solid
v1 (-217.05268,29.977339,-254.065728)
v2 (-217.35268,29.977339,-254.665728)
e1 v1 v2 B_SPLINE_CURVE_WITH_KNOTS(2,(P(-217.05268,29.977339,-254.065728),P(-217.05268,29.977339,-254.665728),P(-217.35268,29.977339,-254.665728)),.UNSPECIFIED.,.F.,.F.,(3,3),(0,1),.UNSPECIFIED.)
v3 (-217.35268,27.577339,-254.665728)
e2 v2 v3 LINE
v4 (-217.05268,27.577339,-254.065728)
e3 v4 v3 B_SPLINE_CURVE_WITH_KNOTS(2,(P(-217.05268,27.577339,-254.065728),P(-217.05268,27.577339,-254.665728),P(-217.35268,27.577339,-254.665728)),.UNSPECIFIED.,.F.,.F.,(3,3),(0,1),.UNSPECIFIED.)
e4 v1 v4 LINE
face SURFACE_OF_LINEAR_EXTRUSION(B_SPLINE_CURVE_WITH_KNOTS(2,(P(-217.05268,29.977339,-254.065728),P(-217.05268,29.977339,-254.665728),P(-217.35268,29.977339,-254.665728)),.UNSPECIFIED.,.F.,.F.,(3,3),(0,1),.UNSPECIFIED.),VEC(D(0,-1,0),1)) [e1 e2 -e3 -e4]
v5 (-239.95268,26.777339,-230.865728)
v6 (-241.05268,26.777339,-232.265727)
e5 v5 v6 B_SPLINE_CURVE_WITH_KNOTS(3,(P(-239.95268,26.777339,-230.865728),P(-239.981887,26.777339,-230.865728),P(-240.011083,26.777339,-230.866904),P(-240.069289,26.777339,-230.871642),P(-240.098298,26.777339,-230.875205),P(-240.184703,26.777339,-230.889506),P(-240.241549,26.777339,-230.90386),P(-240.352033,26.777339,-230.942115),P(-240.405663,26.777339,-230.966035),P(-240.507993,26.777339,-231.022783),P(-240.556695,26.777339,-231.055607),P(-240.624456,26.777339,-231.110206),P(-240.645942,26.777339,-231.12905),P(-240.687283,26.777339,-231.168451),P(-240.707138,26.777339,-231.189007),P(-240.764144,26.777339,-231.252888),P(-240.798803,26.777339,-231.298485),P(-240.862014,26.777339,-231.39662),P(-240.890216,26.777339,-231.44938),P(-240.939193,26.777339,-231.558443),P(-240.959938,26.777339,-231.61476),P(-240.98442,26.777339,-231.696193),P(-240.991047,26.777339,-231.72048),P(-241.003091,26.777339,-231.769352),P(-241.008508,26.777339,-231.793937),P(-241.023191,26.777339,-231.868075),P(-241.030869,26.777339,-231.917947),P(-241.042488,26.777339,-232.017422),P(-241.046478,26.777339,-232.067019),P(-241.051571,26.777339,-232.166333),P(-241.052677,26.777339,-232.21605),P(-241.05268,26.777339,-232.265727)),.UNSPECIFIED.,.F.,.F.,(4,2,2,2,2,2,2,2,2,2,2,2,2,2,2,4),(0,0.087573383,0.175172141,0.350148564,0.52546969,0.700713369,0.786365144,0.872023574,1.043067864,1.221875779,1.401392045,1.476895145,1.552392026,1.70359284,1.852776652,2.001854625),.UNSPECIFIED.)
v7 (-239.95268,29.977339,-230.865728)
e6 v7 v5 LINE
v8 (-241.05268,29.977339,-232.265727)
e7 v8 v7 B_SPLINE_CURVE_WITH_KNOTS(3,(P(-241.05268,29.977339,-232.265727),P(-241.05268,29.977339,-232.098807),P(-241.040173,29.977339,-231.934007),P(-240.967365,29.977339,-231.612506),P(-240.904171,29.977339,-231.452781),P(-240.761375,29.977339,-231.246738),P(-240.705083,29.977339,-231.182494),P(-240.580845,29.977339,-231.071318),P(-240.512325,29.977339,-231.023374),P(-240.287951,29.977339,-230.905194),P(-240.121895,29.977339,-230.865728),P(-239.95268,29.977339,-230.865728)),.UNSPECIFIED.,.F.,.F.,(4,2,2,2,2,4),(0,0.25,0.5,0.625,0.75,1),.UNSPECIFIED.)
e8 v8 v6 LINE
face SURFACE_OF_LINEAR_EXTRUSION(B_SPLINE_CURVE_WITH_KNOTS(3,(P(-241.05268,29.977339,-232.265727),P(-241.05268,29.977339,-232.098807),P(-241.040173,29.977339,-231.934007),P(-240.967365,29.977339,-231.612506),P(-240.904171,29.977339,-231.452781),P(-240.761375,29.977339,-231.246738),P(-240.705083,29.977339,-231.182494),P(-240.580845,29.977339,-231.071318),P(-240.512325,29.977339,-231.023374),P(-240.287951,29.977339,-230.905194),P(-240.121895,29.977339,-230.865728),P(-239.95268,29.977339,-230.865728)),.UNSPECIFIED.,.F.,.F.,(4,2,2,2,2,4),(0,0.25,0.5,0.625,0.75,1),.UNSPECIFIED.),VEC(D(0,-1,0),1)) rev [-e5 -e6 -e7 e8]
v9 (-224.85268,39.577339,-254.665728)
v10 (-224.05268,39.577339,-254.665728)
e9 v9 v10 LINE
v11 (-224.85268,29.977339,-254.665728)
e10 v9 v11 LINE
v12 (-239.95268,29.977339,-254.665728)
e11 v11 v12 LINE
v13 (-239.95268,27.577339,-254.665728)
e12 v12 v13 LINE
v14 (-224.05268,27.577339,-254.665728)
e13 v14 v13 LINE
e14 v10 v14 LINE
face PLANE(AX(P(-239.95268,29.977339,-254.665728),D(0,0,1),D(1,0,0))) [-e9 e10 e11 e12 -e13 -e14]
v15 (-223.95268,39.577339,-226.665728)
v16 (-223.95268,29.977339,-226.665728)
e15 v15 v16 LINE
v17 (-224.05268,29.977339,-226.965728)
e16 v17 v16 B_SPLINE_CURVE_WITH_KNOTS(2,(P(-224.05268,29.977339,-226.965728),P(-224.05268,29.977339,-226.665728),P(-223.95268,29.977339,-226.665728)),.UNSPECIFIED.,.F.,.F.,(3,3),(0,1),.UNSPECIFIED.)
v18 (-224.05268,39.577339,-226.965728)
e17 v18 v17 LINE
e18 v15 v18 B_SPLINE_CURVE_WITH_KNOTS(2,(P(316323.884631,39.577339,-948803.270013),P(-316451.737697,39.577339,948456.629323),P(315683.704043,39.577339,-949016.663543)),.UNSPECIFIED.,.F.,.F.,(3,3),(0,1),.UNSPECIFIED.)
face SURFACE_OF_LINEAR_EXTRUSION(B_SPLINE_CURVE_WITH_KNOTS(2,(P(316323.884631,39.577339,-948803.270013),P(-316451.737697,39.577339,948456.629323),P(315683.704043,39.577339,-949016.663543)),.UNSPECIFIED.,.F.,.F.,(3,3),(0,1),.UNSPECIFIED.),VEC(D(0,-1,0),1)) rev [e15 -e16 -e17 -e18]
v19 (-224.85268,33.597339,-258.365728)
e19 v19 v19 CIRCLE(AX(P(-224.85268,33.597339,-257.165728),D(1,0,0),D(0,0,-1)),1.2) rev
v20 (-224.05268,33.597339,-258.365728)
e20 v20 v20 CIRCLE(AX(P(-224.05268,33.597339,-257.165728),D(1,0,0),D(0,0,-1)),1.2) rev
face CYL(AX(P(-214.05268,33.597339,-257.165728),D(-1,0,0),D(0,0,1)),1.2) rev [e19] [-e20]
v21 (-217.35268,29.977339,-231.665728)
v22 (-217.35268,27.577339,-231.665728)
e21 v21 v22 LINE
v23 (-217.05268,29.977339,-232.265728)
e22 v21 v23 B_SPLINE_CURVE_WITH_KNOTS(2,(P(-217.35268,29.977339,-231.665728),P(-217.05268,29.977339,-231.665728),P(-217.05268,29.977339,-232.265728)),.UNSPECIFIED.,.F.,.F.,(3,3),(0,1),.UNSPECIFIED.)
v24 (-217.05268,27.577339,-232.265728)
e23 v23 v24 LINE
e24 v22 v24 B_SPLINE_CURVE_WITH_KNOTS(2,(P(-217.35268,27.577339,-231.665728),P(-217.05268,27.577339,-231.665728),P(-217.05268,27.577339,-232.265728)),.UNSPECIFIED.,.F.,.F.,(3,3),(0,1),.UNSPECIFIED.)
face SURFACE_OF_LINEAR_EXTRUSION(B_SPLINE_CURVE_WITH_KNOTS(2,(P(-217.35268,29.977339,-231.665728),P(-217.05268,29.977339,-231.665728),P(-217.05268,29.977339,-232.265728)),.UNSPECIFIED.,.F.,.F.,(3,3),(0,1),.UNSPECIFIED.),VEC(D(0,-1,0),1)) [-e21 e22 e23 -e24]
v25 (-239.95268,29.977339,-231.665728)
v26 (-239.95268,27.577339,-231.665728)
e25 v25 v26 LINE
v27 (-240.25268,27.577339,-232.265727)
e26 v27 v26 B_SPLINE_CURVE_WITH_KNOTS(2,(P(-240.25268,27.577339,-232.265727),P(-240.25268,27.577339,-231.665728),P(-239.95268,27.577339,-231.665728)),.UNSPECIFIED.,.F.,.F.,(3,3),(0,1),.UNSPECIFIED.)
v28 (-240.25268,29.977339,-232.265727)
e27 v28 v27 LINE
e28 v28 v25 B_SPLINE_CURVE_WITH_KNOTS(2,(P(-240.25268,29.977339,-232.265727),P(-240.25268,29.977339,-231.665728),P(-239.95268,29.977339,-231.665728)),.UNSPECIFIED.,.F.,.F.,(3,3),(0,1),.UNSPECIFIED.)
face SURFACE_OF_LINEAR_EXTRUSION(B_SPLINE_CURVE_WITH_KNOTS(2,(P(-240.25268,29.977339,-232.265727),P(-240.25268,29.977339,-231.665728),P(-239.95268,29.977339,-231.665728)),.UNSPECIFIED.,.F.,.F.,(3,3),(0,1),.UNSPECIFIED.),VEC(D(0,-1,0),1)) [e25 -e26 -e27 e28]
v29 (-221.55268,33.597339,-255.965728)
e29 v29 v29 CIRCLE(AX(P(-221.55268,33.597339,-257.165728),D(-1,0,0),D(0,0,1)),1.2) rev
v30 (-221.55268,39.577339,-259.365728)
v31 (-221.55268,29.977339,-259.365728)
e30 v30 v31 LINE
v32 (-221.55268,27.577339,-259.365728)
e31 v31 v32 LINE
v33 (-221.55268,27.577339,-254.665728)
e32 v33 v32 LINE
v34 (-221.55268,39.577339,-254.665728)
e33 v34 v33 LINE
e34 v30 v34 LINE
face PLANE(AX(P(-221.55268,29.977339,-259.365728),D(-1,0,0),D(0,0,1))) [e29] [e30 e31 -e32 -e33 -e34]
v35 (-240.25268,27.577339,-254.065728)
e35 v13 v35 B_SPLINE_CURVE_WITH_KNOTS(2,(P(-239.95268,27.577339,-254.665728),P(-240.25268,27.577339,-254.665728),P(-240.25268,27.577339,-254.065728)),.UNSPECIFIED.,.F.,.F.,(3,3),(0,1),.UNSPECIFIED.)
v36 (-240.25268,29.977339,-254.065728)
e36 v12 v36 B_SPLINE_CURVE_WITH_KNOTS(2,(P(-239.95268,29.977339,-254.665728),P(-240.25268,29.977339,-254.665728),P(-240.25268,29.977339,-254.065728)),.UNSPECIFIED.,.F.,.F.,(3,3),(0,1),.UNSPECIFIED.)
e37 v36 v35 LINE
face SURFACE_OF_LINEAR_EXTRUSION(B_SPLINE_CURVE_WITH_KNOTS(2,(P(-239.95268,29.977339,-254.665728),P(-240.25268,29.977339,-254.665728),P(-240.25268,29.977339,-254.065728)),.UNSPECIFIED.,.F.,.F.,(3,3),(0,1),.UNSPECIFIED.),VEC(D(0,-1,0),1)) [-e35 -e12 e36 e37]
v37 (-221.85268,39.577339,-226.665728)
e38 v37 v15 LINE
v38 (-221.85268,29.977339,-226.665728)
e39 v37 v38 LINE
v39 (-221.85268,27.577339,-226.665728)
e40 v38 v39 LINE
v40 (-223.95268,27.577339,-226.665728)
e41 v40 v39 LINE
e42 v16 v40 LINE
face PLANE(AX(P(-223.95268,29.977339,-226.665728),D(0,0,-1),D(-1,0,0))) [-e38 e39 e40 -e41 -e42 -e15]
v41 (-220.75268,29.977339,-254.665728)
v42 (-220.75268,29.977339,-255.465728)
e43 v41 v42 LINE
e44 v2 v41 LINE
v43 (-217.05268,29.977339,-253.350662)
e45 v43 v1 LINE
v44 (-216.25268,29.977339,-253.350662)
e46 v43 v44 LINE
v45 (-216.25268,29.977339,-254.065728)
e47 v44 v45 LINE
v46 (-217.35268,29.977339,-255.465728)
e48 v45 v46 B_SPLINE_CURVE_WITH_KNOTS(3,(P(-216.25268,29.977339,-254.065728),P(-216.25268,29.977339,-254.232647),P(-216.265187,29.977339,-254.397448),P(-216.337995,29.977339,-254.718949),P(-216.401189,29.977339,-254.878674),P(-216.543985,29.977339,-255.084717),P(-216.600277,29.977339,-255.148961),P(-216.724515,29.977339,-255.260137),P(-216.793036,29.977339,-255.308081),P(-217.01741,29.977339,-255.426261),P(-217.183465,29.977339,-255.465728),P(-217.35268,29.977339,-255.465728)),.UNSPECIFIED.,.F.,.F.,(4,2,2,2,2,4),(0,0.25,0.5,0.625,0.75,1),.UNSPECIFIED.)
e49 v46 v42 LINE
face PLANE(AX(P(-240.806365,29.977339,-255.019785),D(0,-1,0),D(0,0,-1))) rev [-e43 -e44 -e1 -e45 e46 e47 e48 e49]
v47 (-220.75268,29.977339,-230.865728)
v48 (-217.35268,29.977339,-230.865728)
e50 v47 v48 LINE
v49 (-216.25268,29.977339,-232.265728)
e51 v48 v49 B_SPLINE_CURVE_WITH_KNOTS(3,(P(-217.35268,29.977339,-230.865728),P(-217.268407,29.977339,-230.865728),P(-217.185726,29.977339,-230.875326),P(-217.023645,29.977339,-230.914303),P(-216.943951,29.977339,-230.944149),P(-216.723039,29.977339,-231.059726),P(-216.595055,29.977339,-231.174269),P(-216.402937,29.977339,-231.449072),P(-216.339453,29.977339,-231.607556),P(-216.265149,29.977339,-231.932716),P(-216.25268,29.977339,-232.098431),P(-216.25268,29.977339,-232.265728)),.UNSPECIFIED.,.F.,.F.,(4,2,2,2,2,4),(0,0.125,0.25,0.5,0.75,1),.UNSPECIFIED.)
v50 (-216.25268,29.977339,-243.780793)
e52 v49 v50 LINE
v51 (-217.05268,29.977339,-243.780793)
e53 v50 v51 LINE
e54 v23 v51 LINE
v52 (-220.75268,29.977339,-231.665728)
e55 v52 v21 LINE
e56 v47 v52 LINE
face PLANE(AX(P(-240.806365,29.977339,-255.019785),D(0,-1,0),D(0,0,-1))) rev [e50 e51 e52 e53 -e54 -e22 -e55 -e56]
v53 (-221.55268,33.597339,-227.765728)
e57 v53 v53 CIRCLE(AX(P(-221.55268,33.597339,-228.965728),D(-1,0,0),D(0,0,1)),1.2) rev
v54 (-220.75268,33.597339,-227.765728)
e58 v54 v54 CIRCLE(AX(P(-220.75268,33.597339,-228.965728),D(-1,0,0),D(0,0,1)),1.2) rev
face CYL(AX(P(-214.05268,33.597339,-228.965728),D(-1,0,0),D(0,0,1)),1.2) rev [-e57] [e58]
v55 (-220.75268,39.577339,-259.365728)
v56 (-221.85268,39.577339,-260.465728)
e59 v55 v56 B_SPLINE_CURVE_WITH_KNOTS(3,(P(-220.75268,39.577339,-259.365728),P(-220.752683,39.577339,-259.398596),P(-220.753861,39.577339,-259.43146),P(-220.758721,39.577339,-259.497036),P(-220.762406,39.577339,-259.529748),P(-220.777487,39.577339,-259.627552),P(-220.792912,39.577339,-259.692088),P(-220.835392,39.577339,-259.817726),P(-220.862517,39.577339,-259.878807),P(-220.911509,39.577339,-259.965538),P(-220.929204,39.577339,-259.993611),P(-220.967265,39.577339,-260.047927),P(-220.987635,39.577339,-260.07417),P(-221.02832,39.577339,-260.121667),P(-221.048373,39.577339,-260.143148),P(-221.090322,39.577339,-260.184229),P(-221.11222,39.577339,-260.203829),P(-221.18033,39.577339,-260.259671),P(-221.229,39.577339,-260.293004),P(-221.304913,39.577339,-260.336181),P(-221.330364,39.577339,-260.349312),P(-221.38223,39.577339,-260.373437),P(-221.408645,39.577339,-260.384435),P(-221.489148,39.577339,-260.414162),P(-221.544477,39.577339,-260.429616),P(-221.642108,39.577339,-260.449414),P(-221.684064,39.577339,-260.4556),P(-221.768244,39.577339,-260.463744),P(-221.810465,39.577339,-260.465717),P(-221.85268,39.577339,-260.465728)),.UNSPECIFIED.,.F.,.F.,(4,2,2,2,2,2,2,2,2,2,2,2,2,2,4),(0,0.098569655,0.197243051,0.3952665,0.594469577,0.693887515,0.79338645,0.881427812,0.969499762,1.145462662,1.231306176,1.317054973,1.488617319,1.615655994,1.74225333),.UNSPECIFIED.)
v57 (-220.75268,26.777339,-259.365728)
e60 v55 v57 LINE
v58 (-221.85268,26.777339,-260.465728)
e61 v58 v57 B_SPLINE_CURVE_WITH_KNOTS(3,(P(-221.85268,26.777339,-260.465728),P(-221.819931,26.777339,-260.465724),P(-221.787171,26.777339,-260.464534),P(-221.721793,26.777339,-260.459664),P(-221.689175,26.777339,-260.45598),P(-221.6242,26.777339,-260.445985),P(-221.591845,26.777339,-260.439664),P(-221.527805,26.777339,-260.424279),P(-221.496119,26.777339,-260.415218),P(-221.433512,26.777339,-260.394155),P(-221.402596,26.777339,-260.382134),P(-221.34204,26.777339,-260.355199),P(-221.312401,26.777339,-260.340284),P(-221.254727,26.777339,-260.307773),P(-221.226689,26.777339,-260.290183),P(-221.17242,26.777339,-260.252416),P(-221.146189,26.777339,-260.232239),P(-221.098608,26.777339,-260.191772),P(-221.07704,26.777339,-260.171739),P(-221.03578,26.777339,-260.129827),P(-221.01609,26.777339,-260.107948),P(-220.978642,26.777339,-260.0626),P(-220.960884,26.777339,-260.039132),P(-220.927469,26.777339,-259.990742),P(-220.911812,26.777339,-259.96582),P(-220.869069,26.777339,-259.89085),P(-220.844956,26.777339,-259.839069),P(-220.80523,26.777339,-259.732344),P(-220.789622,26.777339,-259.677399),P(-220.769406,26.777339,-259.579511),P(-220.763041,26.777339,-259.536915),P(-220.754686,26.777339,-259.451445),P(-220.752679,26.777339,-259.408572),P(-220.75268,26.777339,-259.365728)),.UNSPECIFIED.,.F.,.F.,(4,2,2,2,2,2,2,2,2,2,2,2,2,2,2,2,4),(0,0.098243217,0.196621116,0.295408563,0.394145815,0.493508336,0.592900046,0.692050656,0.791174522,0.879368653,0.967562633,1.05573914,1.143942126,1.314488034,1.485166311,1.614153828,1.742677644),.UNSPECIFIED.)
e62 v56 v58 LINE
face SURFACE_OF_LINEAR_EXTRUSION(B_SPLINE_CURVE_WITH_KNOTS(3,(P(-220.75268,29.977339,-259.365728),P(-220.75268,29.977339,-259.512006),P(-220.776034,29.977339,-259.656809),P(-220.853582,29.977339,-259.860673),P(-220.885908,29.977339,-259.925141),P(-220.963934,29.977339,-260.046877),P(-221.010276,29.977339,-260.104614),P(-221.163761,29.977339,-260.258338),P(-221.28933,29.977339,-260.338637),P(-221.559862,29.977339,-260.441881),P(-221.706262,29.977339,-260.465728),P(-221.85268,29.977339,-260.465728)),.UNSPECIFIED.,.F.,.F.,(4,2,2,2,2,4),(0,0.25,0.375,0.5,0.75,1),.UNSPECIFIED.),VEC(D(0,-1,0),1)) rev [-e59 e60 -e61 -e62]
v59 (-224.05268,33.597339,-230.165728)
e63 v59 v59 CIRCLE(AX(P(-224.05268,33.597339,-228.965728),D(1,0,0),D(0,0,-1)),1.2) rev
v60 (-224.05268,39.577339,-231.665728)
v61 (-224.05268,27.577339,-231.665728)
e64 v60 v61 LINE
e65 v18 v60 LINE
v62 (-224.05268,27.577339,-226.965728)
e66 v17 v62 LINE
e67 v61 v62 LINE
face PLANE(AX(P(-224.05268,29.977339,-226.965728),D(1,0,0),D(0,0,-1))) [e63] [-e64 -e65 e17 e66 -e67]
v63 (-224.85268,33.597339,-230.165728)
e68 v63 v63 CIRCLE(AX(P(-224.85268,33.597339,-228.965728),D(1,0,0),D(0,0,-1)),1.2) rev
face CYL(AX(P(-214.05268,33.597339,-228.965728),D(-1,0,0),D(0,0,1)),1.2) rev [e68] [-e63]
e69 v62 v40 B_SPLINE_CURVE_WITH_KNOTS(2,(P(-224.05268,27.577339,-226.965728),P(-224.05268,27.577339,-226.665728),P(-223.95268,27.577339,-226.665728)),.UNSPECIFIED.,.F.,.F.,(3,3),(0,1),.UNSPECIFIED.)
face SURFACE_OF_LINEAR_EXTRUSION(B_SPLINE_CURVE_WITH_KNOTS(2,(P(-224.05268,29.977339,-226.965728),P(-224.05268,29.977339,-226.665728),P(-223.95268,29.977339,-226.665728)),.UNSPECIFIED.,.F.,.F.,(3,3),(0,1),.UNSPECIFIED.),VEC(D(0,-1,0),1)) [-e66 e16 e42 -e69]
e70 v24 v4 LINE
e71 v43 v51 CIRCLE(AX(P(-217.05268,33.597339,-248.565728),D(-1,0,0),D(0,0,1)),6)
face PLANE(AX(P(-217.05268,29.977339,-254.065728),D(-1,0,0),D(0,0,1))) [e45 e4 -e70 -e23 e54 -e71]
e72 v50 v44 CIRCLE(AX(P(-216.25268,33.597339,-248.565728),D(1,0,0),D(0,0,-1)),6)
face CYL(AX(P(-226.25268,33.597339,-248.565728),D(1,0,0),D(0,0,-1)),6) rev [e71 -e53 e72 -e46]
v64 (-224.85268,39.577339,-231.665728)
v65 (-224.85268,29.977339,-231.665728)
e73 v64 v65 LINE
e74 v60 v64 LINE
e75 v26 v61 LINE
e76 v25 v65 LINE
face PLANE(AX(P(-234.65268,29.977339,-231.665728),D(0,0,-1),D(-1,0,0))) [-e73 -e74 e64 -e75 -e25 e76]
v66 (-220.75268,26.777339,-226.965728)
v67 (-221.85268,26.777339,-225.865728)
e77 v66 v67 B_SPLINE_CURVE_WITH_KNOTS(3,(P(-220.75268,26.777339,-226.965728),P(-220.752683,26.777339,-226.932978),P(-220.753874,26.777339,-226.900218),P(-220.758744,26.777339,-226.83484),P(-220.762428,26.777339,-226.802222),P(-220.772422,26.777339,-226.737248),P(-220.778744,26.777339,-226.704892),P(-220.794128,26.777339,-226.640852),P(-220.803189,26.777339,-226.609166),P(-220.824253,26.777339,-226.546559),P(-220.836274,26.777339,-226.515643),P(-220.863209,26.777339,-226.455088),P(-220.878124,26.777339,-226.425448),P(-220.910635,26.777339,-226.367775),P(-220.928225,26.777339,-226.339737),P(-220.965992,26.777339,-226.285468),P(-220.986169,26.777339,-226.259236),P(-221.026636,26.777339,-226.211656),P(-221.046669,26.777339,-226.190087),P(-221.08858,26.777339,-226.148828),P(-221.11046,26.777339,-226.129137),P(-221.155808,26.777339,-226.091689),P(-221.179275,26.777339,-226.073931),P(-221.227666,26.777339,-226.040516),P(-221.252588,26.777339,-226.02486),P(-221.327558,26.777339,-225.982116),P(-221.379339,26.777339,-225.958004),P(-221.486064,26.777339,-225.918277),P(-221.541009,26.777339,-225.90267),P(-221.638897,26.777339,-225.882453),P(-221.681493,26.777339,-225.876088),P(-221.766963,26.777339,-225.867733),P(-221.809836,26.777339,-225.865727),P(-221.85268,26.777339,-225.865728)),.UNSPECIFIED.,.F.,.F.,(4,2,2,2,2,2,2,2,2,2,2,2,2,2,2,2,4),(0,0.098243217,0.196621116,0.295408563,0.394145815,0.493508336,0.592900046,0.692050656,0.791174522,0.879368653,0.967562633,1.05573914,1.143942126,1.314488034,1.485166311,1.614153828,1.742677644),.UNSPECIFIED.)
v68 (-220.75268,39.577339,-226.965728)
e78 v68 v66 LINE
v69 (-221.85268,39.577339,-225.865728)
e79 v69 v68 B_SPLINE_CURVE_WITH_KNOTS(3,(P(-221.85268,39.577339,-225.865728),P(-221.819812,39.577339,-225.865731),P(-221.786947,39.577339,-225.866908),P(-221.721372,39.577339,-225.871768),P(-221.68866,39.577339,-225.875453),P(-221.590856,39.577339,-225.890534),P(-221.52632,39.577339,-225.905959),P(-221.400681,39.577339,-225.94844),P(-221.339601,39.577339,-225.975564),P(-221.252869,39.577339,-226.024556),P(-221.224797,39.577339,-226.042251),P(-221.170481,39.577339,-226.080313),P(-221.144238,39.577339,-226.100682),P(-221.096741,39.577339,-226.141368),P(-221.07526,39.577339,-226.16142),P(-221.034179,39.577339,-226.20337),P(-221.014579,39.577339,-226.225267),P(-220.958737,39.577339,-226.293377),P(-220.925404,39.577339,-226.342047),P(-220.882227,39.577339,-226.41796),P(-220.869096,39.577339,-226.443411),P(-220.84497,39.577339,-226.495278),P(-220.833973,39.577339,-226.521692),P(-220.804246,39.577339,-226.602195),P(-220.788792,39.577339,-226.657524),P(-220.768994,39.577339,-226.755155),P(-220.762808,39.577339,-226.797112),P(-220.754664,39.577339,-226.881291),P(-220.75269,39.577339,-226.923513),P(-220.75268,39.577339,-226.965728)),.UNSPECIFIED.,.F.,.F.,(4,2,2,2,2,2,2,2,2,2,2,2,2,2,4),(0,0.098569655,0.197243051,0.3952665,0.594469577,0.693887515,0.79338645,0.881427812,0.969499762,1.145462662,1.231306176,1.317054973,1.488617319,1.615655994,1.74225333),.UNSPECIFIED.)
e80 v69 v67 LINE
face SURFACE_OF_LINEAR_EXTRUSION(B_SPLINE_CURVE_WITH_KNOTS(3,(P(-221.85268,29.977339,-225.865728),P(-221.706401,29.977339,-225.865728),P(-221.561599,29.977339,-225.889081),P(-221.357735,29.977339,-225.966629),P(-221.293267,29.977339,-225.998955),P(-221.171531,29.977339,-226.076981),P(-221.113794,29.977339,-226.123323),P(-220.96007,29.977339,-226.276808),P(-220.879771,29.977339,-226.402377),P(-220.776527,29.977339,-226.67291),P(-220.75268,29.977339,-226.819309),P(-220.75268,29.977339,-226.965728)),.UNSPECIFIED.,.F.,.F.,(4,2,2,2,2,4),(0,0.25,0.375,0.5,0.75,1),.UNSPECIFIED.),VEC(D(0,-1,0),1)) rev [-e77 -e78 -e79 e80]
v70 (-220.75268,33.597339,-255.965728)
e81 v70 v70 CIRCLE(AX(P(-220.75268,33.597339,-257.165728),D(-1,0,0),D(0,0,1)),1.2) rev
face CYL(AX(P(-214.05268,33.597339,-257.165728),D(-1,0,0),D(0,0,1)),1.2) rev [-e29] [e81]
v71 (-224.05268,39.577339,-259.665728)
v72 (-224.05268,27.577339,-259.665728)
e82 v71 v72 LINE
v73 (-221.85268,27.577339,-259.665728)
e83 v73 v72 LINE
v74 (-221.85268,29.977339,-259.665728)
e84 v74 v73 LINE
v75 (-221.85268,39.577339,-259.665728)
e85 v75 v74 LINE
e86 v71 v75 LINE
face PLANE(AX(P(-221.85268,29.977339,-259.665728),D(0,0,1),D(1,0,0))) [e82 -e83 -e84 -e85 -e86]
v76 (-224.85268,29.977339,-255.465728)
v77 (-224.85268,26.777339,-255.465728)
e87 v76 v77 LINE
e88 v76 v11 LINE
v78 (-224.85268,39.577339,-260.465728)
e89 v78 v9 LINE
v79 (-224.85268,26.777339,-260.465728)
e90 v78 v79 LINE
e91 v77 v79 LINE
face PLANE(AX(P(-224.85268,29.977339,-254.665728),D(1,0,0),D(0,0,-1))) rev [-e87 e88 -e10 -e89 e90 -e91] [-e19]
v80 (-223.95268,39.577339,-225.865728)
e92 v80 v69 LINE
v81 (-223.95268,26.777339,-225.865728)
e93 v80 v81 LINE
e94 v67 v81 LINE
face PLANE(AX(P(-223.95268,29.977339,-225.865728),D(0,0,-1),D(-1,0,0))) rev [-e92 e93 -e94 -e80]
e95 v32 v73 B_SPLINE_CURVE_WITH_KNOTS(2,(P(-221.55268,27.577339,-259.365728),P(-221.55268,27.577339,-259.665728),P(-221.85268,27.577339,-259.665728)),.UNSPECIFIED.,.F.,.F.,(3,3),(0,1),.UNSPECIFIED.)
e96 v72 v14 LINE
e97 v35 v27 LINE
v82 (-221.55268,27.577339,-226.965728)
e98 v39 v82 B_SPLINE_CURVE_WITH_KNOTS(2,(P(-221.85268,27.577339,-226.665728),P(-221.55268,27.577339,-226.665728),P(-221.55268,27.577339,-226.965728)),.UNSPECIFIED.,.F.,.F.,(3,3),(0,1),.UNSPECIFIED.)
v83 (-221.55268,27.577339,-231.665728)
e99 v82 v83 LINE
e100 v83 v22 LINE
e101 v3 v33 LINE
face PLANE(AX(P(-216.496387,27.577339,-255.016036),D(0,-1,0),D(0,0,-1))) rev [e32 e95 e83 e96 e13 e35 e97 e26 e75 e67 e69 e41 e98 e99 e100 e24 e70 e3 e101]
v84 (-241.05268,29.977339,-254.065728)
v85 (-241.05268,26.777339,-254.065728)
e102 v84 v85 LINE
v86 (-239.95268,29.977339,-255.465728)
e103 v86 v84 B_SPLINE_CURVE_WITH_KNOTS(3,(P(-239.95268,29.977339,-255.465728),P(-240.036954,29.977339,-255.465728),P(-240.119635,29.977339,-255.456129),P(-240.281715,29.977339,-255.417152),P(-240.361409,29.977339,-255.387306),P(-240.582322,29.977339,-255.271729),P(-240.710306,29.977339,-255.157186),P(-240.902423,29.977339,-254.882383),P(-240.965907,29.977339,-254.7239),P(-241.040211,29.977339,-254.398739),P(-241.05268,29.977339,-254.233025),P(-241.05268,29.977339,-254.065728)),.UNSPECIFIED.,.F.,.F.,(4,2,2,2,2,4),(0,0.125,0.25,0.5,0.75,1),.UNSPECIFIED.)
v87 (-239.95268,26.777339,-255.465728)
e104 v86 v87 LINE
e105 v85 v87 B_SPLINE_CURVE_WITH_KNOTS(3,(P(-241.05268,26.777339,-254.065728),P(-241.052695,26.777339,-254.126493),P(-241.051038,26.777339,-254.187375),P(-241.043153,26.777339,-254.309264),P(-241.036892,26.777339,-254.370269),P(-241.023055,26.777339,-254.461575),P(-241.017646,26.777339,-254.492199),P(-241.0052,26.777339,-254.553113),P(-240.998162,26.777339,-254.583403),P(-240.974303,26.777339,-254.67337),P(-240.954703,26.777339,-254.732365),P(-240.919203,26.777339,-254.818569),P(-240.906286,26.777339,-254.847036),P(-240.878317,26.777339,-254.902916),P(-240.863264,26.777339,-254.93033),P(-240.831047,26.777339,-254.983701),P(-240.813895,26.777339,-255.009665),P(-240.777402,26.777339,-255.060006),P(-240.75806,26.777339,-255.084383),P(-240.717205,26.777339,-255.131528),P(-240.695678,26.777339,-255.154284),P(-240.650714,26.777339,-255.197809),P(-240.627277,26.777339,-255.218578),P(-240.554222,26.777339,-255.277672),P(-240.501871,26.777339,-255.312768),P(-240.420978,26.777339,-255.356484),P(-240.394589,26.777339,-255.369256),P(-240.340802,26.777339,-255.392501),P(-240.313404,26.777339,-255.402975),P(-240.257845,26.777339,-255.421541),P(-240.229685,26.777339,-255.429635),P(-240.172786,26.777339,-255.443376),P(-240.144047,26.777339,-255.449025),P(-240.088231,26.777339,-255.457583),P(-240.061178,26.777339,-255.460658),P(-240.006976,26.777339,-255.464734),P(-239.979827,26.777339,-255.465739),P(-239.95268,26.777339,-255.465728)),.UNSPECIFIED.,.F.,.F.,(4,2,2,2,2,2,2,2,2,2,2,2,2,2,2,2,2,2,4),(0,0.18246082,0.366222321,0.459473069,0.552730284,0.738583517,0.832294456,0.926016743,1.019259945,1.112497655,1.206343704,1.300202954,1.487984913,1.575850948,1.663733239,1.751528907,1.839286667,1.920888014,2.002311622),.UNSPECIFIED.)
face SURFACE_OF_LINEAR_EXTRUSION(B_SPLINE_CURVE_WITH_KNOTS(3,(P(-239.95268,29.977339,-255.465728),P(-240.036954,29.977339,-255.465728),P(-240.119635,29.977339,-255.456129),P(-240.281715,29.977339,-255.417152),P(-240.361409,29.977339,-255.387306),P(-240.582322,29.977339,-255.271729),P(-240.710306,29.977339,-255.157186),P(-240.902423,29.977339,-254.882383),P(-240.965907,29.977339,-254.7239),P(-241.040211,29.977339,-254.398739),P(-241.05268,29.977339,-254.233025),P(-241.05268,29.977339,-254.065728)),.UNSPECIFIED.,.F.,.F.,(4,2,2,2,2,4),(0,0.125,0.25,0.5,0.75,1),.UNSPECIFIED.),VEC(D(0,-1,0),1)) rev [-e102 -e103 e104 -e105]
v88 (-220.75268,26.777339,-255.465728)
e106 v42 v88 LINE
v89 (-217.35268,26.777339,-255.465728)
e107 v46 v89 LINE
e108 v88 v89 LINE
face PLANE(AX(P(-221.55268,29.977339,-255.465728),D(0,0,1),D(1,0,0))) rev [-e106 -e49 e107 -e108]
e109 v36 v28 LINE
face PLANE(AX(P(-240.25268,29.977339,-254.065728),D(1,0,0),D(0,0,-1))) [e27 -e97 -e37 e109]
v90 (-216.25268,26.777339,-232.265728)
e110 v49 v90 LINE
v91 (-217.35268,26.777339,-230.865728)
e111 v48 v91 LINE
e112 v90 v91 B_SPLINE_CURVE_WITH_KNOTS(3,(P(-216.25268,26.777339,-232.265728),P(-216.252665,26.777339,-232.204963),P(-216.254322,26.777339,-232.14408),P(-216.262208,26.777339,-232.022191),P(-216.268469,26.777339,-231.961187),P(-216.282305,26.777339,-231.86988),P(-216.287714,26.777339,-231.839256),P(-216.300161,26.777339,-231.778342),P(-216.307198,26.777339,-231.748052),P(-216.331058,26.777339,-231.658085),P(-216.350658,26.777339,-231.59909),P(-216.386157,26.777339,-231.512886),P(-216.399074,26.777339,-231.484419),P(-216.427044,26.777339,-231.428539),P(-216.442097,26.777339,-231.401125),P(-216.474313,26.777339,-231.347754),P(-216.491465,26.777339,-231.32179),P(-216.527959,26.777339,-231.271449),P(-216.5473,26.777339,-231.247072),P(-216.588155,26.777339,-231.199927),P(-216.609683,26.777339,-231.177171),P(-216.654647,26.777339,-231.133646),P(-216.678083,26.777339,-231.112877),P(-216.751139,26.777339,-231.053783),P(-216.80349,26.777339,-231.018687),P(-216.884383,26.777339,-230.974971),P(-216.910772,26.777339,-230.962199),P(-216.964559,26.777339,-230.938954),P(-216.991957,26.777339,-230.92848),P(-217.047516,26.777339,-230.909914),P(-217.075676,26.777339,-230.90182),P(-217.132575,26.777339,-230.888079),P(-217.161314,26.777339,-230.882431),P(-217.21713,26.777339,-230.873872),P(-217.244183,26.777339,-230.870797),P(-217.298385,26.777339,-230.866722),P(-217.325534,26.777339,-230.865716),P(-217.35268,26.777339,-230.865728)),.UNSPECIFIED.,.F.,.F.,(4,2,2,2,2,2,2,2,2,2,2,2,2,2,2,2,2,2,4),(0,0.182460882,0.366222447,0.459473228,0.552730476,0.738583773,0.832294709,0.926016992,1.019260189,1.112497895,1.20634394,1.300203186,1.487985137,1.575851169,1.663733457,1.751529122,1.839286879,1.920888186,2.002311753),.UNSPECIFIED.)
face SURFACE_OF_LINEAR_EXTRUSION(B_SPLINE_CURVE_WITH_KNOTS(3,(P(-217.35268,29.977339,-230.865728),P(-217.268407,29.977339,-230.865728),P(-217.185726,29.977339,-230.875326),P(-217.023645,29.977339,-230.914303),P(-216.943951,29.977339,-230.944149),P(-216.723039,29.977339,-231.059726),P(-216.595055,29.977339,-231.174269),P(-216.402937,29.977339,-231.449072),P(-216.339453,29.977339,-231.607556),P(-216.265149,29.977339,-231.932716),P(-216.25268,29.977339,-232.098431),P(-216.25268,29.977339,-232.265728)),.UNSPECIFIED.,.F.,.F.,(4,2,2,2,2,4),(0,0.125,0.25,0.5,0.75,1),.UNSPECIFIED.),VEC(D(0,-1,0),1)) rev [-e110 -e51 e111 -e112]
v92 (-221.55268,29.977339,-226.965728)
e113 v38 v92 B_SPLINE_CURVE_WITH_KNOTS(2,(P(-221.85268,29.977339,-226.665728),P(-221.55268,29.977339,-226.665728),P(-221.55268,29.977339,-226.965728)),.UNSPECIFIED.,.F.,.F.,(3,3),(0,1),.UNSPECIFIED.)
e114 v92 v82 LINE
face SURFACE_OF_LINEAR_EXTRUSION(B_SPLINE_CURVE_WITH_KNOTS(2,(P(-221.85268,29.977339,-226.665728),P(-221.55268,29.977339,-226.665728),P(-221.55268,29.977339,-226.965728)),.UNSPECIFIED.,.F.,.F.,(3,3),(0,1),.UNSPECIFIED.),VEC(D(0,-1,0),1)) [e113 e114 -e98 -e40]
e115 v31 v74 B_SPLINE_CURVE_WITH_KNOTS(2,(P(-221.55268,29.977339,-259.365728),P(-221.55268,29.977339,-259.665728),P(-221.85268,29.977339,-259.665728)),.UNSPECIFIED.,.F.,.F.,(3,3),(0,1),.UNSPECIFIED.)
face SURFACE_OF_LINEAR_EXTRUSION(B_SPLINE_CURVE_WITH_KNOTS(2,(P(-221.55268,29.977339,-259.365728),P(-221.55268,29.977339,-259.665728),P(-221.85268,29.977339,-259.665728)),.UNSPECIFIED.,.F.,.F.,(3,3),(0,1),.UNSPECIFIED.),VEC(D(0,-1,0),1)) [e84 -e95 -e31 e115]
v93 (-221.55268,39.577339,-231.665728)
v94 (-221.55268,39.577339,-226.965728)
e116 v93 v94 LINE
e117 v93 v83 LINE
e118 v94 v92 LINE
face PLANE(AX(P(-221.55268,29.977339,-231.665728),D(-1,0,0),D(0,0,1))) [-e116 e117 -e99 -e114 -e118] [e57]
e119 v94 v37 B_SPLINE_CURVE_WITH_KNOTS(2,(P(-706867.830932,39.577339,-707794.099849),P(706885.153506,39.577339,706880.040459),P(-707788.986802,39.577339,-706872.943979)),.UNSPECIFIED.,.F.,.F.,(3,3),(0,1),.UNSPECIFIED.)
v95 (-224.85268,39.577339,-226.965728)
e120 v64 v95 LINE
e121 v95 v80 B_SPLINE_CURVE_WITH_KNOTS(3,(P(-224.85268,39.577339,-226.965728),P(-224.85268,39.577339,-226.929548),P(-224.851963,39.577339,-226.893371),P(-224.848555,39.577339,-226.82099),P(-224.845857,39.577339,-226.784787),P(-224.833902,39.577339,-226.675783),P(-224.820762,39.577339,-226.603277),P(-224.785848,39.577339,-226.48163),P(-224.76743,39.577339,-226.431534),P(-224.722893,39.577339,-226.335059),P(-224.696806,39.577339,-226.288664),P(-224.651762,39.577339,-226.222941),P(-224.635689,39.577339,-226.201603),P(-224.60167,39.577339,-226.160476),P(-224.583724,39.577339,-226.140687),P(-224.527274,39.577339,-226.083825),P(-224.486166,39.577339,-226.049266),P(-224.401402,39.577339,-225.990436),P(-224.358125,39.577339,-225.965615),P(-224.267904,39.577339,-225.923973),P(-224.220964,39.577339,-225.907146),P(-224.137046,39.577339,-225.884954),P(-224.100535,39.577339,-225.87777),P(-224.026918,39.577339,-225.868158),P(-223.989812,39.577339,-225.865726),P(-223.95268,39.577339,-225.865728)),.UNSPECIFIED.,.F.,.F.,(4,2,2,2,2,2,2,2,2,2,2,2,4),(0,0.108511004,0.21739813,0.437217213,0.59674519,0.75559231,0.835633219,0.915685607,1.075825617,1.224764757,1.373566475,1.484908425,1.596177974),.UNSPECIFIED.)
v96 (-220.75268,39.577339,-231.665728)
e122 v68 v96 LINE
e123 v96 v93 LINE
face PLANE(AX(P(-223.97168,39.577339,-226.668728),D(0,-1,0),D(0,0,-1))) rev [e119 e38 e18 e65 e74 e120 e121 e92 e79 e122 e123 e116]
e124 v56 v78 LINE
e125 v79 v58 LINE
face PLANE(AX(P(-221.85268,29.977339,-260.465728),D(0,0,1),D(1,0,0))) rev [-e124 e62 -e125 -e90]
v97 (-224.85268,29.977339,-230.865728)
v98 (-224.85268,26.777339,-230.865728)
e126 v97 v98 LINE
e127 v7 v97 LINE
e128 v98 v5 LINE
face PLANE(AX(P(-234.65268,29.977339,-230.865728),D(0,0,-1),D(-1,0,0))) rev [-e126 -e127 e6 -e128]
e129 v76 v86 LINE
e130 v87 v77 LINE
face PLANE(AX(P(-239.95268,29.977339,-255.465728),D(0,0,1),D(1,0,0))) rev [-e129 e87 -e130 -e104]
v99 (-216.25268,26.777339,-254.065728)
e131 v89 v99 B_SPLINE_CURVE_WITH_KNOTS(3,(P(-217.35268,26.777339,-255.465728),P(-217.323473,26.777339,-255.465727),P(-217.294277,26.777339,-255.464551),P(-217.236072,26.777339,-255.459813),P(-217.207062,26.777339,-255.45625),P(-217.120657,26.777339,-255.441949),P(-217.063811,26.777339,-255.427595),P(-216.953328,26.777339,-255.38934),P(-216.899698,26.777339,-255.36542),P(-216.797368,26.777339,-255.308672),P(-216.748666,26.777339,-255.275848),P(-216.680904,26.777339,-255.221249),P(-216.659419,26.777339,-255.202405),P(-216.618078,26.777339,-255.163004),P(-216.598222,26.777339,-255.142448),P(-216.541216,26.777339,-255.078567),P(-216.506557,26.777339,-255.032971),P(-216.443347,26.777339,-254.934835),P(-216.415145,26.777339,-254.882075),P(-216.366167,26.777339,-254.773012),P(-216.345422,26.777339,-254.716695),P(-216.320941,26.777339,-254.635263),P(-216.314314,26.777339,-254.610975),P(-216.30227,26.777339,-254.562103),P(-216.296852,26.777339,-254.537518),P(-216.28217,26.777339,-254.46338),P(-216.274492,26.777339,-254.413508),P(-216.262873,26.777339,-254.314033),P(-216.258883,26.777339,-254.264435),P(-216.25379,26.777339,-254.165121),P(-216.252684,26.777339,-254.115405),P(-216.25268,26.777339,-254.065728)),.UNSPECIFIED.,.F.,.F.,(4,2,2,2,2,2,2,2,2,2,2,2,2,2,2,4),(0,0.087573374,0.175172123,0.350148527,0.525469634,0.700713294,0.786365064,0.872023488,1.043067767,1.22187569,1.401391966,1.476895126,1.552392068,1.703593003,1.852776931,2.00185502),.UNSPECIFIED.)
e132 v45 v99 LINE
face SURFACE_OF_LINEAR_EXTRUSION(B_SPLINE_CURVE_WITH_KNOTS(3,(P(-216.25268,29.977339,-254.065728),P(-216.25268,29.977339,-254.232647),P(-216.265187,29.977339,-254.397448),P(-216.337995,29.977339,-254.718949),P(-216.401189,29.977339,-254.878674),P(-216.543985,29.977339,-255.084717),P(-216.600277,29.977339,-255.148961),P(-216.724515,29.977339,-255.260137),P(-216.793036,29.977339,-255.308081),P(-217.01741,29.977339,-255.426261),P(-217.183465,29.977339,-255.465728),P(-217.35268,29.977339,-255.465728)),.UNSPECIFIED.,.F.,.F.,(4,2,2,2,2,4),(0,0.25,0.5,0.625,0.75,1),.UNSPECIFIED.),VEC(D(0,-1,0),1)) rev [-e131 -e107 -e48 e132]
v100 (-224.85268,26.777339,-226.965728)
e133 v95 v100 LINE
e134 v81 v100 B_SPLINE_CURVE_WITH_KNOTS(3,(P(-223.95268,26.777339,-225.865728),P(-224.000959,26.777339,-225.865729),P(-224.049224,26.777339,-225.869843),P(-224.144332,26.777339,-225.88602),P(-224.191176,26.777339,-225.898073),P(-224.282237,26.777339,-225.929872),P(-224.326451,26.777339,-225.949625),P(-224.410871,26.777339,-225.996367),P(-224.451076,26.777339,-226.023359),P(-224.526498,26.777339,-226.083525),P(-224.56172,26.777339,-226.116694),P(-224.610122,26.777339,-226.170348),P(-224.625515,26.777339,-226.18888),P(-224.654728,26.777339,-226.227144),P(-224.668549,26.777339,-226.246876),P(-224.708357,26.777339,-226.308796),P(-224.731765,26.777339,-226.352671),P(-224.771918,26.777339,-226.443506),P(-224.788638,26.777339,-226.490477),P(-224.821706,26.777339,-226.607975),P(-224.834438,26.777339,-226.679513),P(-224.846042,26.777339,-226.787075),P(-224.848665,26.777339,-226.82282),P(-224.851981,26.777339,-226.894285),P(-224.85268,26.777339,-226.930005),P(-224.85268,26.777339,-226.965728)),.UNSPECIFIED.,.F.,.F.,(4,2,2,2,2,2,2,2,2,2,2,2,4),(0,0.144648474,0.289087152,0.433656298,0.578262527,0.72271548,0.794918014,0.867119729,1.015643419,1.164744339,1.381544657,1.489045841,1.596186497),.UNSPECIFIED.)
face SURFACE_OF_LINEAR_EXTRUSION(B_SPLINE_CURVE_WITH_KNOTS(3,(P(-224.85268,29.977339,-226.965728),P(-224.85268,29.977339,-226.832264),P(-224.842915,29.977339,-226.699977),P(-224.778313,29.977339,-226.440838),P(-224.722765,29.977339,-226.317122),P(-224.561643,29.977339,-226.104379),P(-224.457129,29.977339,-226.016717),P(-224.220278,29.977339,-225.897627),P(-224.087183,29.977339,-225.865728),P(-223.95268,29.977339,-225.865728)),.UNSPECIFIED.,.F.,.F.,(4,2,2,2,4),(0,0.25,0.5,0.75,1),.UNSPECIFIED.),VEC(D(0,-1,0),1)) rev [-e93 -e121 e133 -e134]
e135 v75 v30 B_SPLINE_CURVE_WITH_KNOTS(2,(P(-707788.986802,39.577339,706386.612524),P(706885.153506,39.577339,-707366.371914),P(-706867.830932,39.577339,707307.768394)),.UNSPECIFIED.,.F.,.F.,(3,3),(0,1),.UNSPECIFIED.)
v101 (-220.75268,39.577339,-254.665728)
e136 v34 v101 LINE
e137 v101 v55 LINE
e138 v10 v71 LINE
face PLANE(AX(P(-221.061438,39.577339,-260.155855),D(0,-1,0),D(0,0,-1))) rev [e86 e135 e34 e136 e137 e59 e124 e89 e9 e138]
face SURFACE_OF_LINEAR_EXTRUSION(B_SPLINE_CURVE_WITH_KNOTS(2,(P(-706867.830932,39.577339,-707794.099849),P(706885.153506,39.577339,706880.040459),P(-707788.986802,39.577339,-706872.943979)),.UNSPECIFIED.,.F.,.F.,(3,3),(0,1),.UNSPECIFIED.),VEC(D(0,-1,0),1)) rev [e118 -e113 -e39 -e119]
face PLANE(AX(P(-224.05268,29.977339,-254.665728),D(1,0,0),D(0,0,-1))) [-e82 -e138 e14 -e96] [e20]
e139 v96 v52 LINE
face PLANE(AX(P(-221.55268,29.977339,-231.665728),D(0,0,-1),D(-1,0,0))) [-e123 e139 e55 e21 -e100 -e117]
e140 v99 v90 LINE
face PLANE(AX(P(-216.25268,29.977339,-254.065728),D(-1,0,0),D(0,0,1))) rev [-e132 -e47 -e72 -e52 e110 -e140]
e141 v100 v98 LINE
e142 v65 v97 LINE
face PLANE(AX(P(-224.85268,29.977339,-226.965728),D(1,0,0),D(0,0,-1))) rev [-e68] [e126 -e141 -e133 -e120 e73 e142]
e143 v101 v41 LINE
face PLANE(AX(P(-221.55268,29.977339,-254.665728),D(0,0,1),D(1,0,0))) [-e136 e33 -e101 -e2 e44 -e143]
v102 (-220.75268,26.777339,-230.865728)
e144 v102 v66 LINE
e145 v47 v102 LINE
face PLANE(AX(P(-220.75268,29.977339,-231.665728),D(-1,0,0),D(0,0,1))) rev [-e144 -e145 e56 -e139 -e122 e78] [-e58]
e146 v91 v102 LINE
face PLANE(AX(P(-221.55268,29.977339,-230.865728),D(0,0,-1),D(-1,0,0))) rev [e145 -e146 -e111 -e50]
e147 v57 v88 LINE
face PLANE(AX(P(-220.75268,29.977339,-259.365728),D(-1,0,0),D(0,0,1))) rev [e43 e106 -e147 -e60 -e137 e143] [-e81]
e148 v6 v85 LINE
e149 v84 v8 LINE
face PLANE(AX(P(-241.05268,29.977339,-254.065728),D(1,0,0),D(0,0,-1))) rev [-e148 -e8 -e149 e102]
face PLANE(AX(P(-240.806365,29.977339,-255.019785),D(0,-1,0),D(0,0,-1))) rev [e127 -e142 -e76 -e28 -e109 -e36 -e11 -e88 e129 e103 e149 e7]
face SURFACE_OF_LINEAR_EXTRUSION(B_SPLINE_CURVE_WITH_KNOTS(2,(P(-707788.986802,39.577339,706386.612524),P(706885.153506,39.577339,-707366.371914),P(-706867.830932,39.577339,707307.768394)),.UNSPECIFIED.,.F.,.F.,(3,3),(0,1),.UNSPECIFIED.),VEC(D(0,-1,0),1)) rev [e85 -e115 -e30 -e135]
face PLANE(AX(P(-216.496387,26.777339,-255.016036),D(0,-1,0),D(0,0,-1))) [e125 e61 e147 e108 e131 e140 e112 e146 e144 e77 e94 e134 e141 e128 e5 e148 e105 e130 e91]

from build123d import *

# Parameters (mm, degrees)
EXTRUDE_THIN1_DEPTH     = 2.4
CUT_EXTRUDE1_DEPTH      = 10
BOSS_EXTRUDE1_DEPTH     = 0.8
BOSS_EXTRUDE2_DEPTH     = 9.6
CUT_EXTRUDE2_DEPTH      = 10
CUT_EXTRUDE2_DEPTH_BACK = 9.6
SKETCH5_R               = 1.2
BOSS_EXTRUDE3_DEPTH     = 9.6
CUT_EXTRUDE3_DEPTH      = 10
CUT_EXTRUDE3_DEPTH_BACK = 9.6
SKETCH8_R               = 1.2


# Read off the part's stored shape, not the designer's step: Extrude-Thin1
with BuildPart() as part:
    # Extrude-Thin1 outline → Extrude-Thin1 (new body)
    with BuildSketch(Plane(origin=(0, 27.577339236, 0), x_dir=(1, 0, 0), z_dir=(0, 1, 0))):
        with BuildLine():
            Line((-221.85268026, 260.465727588), (-224.85268026, 260.465727588))
            Line((-224.85268026, 260.465727588), (-224.85268026, 255.465727588))
            Line((-224.85268026, 255.465727588), (-239.95268026, 255.465727588))
            add(Edge.make_bspline(
                [(-239.95268026, 255.465727588), (-240.036953855, 255.465727588), (-240.119634905, 255.456128928), (-240.281715302, 255.417151974), (-240.361409143, 255.387305758), (-240.582321505, 255.271729013), (-240.710305754, 255.157186074), (-240.902423276, 254.88238325), (-240.965907148, 254.723899526), (-241.040211449, 254.398738857), (-241.05268026, 254.23302474), (-241.05268026, 254.065727588)],
                knots=[0, 0, 0, 0, 0.125, 0.125, 0.25, 0.25, 0.5, 0.5, 0.75, 0.75, 1, 1, 1, 1], degree=3))
            Line((-241.05268026, 254.065727588), (-241.05268026, 232.26572715))
            add(Edge.make_bspline(
                [(-241.05268026, 232.26572715), (-241.05268026, 232.098807375), (-241.040173408, 231.934007095), (-240.967365099, 231.612506131), (-240.904171119, 231.452780727), (-240.761375105, 231.246738134), (-240.705083291, 231.182493851), (-240.580845123, 231.071317608), (-240.512324697, 231.023373693), (-240.287950739, 230.905193813), (-240.121895067, 230.865727588), (-239.95268026, 230.865727588)],
                knots=[0, 0, 0, 0, 0.25, 0.25, 0.5, 0.5, 0.625, 0.625, 0.75, 0.75, 1, 1, 1, 1], degree=3))
            Line((-239.95268026, 230.865727588), (-224.85268026, 230.865727588))
            Line((-224.85268026, 230.865727588), (-224.85268026, 226.965727588))
            add(Edge.make_bspline(
                [(-224.85268026, 226.965727588), (-224.85268026, 226.832263963), (-224.842915454, 226.699977447), (-224.778312529, 226.440837832), (-224.722765281, 226.317121604), (-224.561642632, 226.104378576), (-224.457129257, 226.016716914), (-224.220278277, 225.897626505), (-224.087183417, 225.865727588), (-223.95268026, 225.865727588)],
                knots=[0, 0, 0, 0, 0.25, 0.25, 0.5, 0.5, 0.75, 0.75, 1, 1, 1, 1], degree=3))
            Line((-223.95268026, 225.865727588), (-221.85268026, 225.865727588))
            add(Edge.make_bspline(
                [(-221.85268026, 225.865727588), (-221.706401491, 225.865727588), (-221.561598635, 225.889080891), (-221.357734958, 225.966629211), (-221.293267189, 225.998955372), (-221.171531343, 226.076981138), (-221.11379386, 226.123323344), (-220.960069989, 226.2768079), (-220.879771324, 226.40237724), (-220.776526804, 226.672909538), (-220.75268026, 226.819308973), (-220.75268026, 226.965727588)],
                knots=[0, 0, 0, 0, 0.25, 0.25, 0.375, 0.375, 0.5, 0.5, 0.75, 0.75, 1, 1, 1, 1], degree=3))
            Line((-220.75268026, 226.965727588), (-220.75268026, 230.865727588))
            Line((-220.75268026, 230.865727588), (-217.35268026, 230.865727588))
            add(Edge.make_bspline(
                [(-217.35268026, 230.865727588), (-217.268406659, 230.865727588), (-217.185725604, 230.875326251), (-217.023645197, 230.914303211), (-216.943951352, 230.944149433), (-216.723038981, 231.059726197), (-216.595054733, 231.174269153), (-216.402937217, 231.449072013), (-216.339453355, 231.607555751), (-216.265149067, 231.932716443), (-216.25268026, 232.098430571), (-216.25268026, 232.265727733)],
                knots=[0, 0, 0, 0, 0.125, 0.125, 0.25, 0.25, 0.5, 0.5, 0.75, 0.75, 1, 1, 1, 1], degree=3))
            Line((-216.25268026, 232.265727733), (-216.25268026, 254.065727588))
            add(Edge.make_bspline(
                [(-216.25268026, 254.065727588), (-216.25268026, 254.232647394), (-216.265187101, 254.397447706), (-216.337995368, 254.718948734), (-216.401189322, 254.878674187), (-216.543985311, 255.084716854), (-216.600277123, 255.148961165), (-216.724515296, 255.260137461), (-216.793035717, 255.308081394), (-217.017409717, 255.426261342), (-217.183465417, 255.465727588), (-217.35268026, 255.465727588)],
                knots=[0, 0, 0, 0, 0.25, 0.25, 0.5, 0.5, 0.625, 0.625, 0.75, 0.75, 1, 1, 1, 1], degree=3))
            Line((-217.35268026, 255.465727588), (-220.75268026, 255.465727588))
            Line((-220.75268026, 255.465727588), (-220.75268026, 259.365727588))
            add(Edge.make_bspline(
                [(-220.75268026, 259.365727588), (-220.75268026, 259.512006357), (-220.776033562, 259.656809213), (-220.853581882, 259.86067289), (-220.885908043, 259.925140659), (-220.96393381, 260.046876505), (-221.010276016, 260.104613988), (-221.163760572, 260.258337859), (-221.289329911, 260.338636524), (-221.559862209, 260.441881044), (-221.706261645, 260.465727588), (-221.85268026, 260.465727588)],
                knots=[0, 0, 0, 0, 0.25, 0.25, 0.375, 0.375, 0.5, 0.5, 0.75, 0.75, 1, 1, 1, 1], degree=3))
        make_face()
        with BuildLine():
            Line((-224.05268026, 254.665727588), (-224.05268026, 259.665727588))
            Line((-224.05268026, 259.665727588), (-221.85268026, 259.665727588))
            add(Edge.make_bspline(
                [(-221.55268026, 259.365727588), (-221.55268026, 259.665727588), (-221.85268026, 259.665727588)],
                knots=[0, 0, 0, 1, 1, 1], degree=2))
            Line((-221.55268026, 259.365727588), (-221.55268026, 254.665727588))
            Line((-221.55268026, 254.665727588), (-217.35268026, 254.665727588))
            add(Edge.make_bspline(
                [(-217.05268026, 254.065727588), (-217.05268026, 254.665727588), (-217.35268026, 254.665727588)],
                knots=[0, 0, 0, 1, 1, 1], degree=2))
            Line((-217.05268026, 254.065727588), (-217.05268026, 232.265727733))
            add(Edge.make_bspline(
                [(-217.35268026, 231.665727588), (-217.05268026, 231.665727588), (-217.05268026, 232.265727733)],
                knots=[0, 0, 0, 1, 1, 1], degree=2))
            Line((-217.35268026, 231.665727588), (-221.55268026, 231.665727588))
            Line((-221.55268026, 231.665727588), (-221.55268026, 226.965727588))
            add(Edge.make_bspline(
                [(-221.85268026, 226.665727588), (-221.55268026, 226.665727588), (-221.55268026, 226.965727588)],
                knots=[0, 0, 0, 1, 1, 1], degree=2))
            Line((-221.85268026, 226.665727588), (-223.95268026, 226.665727588))
            add(Edge.make_bspline(
                [(-224.05268026, 226.965727588), (-224.05268026, 226.665727588), (-223.95268026, 226.665727588)],
                knots=[0, 0, 0, 1, 1, 1], degree=2))
            Line((-224.05268026, 226.965727588), (-224.05268026, 231.665727588))
            Line((-224.05268026, 231.665727588), (-239.95268026, 231.665727588))
            add(Edge.make_bspline(
                [(-240.25268026, 232.26572715), (-240.25268026, 231.665727588), (-239.95268026, 231.665727588)],
                knots=[0, 0, 0, 1, 1, 1], degree=2))
            Line((-240.25268026, 232.26572715), (-240.25268026, 254.065727588))
            add(Edge.make_bspline(
                [(-239.95268026, 254.665727588), (-240.25268026, 254.665727588), (-240.25268026, 254.065727588)],
                knots=[0, 0, 0, 1, 1, 1], degree=2))
            Line((-239.95268026, 254.665727588), (-224.05268026, 254.665727588))
        make_face(mode=Mode.SUBTRACT)
    extrude(amount=EXTRUDE_THIN1_DEPTH)

    # Sketch2 → Cut-Extrude1 (cut)
    with BuildSketch(Plane(origin=(-216.25268026, 0, 0), x_dir=(0, 0, -1), z_dir=(1, 0, 0))):
        with BuildLine():
            Line((243.543526876, 30.314428941), (253.35066228, 29.977339236))
            ThreePointArc((253.35066228, 29.977339236), (248.359618009, 27.600880377), (243.543526876, 30.314428941))
        make_face()
    extrude(amount=-CUT_EXTRUDE1_DEPTH, mode=Mode.SUBTRACT)

    # Sketch3 → Boss-Extrude1 (add)
    with BuildSketch(Plane.XZ.offset(-27.577339236)):
        with BuildLine():
            Line((-217.35268026, -255.465727588), (-220.75268026, -255.465727588))
            Line((-220.75268026, -255.465727588), (-220.75268026, -259.365727588))
            add(Edge.make_bspline(
                [(-220.75268026, -259.365727588), (-220.75268026, -259.512006357), (-220.776033562, -259.656809213), (-220.853581882, -259.86067289), (-220.885908043, -259.925140659), (-220.96393381, -260.046876505), (-221.010276016, -260.104613988), (-221.163760572, -260.258337859), (-221.289329911, -260.338636524), (-221.559862209, -260.441881044), (-221.706261645, -260.465727588), (-221.85268026, -260.465727588)],
                knots=[0, 0, 0, 0, 0.25, 0.25, 0.375, 0.375, 0.5, 0.5, 0.75, 0.75, 1, 1, 1, 1], degree=3))
            Line((-221.85268026, -260.465727588), (-224.85268026, -260.465727588))
            Line((-224.85268026, -260.465727588), (-224.85268026, -255.465727588))
            Line((-224.85268026, -255.465727588), (-239.95268026, -255.465727588))
            add(Edge.make_bspline(
                [(-239.95268026, -255.465727588), (-240.036953855, -255.465727588), (-240.119634905, -255.456128928), (-240.281715302, -255.417151974), (-240.361409143, -255.387305758), (-240.582321505, -255.271729013), (-240.710305754, -255.157186074), (-240.902423276, -254.88238325), (-240.965907148, -254.723899526), (-241.040211449, -254.398738857), (-241.05268026, -254.23302474), (-241.05268026, -254.065727588)],
                knots=[0, 0, 0, 0, 0.125, 0.125, 0.25, 0.25, 0.5, 0.5, 0.75, 0.75, 1, 1, 1, 1], degree=3))
            Line((-241.05268026, -254.065727588), (-241.05268026, -232.26572715))
            add(Edge.make_bspline(
                [(-241.05268026, -232.26572715), (-241.05268026, -232.098807375), (-241.040173408, -231.934007095), (-240.967365099, -231.612506131), (-240.904171119, -231.452780727), (-240.761375105, -231.246738134), (-240.705083291, -231.182493851), (-240.580845123, -231.071317608), (-240.512324697, -231.023373693), (-240.287950739, -230.905193813), (-240.121895067, -230.865727588), (-239.95268026, -230.865727588)],
                knots=[0, 0, 0, 0, 0.25, 0.25, 0.5, 0.5, 0.625, 0.625, 0.75, 0.75, 1, 1, 1, 1], degree=3))
            Line((-239.95268026, -230.865727588), (-224.85268026, -230.865727588))
            Line((-224.85268026, -230.865727588), (-224.85268026, -226.965727588))
            add(Edge.make_bspline(
                [(-224.85268026, -226.965727588), (-224.85268026, -226.832263963), (-224.842915454, -226.699977447), (-224.778312529, -226.440837832), (-224.722765281, -226.317121604), (-224.561642632, -226.104378576), (-224.457129257, -226.016716914), (-224.220278277, -225.897626505), (-224.087183417, -225.865727588), (-223.95268026, -225.865727588)],
                knots=[0, 0, 0, 0, 0.25, 0.25, 0.5, 0.5, 0.75, 0.75, 1, 1, 1, 1], degree=3))
            Line((-223.95268026, -225.865727588), (-221.85268026, -225.865727588))
            add(Edge.make_bspline(
                [(-221.85268026, -225.865727588), (-221.706401491, -225.865727588), (-221.561598635, -225.889080891), (-221.357734958, -225.966629211), (-221.293267189, -225.998955372), (-221.171531343, -226.076981138), (-221.11379386, -226.123323344), (-220.960069989, -226.2768079), (-220.879771324, -226.40237724), (-220.776526804, -226.672909538), (-220.75268026, -226.819308973), (-220.75268026, -226.965727588)],
                knots=[0, 0, 0, 0, 0.25, 0.25, 0.375, 0.375, 0.5, 0.5, 0.75, 0.75, 1, 1, 1, 1], degree=3))
            Line((-220.75268026, -226.965727588), (-220.75268026, -230.865727588))
            Line((-220.75268026, -230.865727588), (-217.35268026, -230.865727588))
            add(Edge.make_bspline(
                [(-217.35268026, -230.865727588), (-217.268406659, -230.865727588), (-217.185725604, -230.875326251), (-217.023645197, -230.914303211), (-216.943951352, -230.944149433), (-216.723038981, -231.059726197), (-216.595054733, -231.174269153), (-216.402937217, -231.449072013), (-216.339453355, -231.607555751), (-216.265149067, -231.932716443), (-216.25268026, -232.098430571), (-216.25268026, -232.265727733)],
                knots=[0, 0, 0, 0, 0.125, 0.125, 0.25, 0.25, 0.5, 0.5, 0.75, 0.75, 1, 1, 1, 1], degree=3))
            Line((-216.25268026, -232.265727733), (-216.25268026, -254.065727588))
            add(Edge.make_bspline(
                [(-216.25268026, -254.065727588), (-216.25268026, -254.232647394), (-216.265187101, -254.397447706), (-216.337995368, -254.718948734), (-216.401189322, -254.878674187), (-216.543985311, -255.084716854), (-216.600277123, -255.148961165), (-216.724515296, -255.260137461), (-216.793035717, -255.308081394), (-217.017409717, -255.426261342), (-217.183465417, -255.465727588), (-217.35268026, -255.465727588)],
                knots=[0, 0, 0, 0, 0.25, 0.25, 0.5, 0.5, 0.625, 0.625, 0.75, 0.75, 1, 1, 1, 1], degree=3))
        make_face()
    extrude(amount=BOSS_EXTRUDE1_DEPTH)

    # Sketch4 → Boss-Extrude2 (add)
    with BuildSketch(Plane(origin=(0, 29.977339236, 0), x_dir=(1, 0, 0), z_dir=(0, 1, 0))):
        with BuildLine():
            Line((-224.05268026, 231.665727588), (-224.85268026, 231.665727588))
            Line((-224.85268026, 231.665727588), (-224.85268026, 226.965727588))
            add(Edge.make_bspline(
                [(-224.85268026, 226.965727588), (-224.85268026, 226.832263963), (-224.842915454, 226.699977447), (-224.778312529, 226.440837832), (-224.722765281, 226.317121604), (-224.561642632, 226.104378576), (-224.457129257, 226.016716914), (-224.220278277, 225.897626505), (-224.087183417, 225.865727588), (-223.95268026, 225.865727588)],
                knots=[0, 0, 0, 0, 0.25, 0.25, 0.5, 0.5, 0.75, 0.75, 1, 1, 1, 1], degree=3))
            Line((-223.95268026, 225.865727588), (-221.85268026, 225.865727588))
            add(Edge.make_bspline(
                [(-221.85268026, 225.865727588), (-221.706401491, 225.865727588), (-221.561598635, 225.889080891), (-221.357734958, 225.966629211), (-221.293267189, 225.998955372), (-221.171531343, 226.076981138), (-221.11379386, 226.123323344), (-220.960069989, 226.2768079), (-220.879771324, 226.40237724), (-220.776526804, 226.672909538), (-220.75268026, 226.819308973), (-220.75268026, 226.965727588)],
                knots=[0, 0, 0, 0, 0.25, 0.25, 0.375, 0.375, 0.5, 0.5, 0.75, 0.75, 1, 1, 1, 1], degree=3))
            Line((-220.75268026, 226.965727588), (-220.75268026, 230.865727588))
            Line((-220.75268026, 230.865727588), (-220.75268026, 231.665727588))
            Line((-220.75268026, 231.665727588), (-221.55268026, 231.665727588))
            Line((-221.55268026, 231.665727588), (-221.55268026, 226.965727588))
            add(Edge.make_bspline(
                [(-221.85268026, 226.665727588), (-221.55268026, 226.665727588), (-221.55268026, 226.965727588)],
                knots=[0, 0, 0, 1, 1, 1], degree=2))
            Line((-221.85268026, 226.665727588), (-223.95268026, 226.665727588))
            add(Edge.make_bspline(
                [(-224.05268026, 226.965727588), (-224.05268026, 226.665727588), (-223.95268026, 226.665727588)],
                knots=[0, 0, 0, 1, 1, 1], degree=2))
            Line((-224.05268026, 226.965727588), (-224.05268026, 231.665727588))
        make_face()
    extrude(amount=BOSS_EXTRUDE2_DEPTH)

    # Sketch5 → Cut-Extrude2 (cut, two sides: drawn at the far end of the back side and taken through both)
    with BuildSketch(Plane(origin=(-224.05268026, 0, 0), x_dir=(0, 0, -1), z_dir=(1, 0, 0)).offset(-CUT_EXTRUDE2_DEPTH_BACK)):
        with Locations(Location((228.965727588, 33.597339236, 0), (0, 0, 180))):
            Circle(SKETCH5_R)
    extrude(amount=CUT_EXTRUDE2_DEPTH + CUT_EXTRUDE2_DEPTH_BACK, mode=Mode.SUBTRACT)

    # Sketch6 → Boss-Extrude3 (add)
    with BuildSketch(Plane(origin=(0, 29.977339236, 0), x_dir=(1, 0, 0), z_dir=(0, 1, 0))):
        with BuildLine():
            Line((-224.05268026, 254.665727588), (-224.85268026, 254.665727588))
            Line((-224.85268026, 254.665727588), (-224.85268026, 255.465727588))
            Line((-224.85268026, 255.465727588), (-224.85268026, 260.465727588))
            Line((-224.85268026, 260.465727588), (-221.85268026, 260.465727588))
            add(Edge.make_bspline(
                [(-220.75268026, 259.365727588), (-220.75268026, 259.512006357), (-220.776033562, 259.656809213), (-220.853581882, 259.86067289), (-220.885908043, 259.925140659), (-220.96393381, 260.046876505), (-221.010276016, 260.104613988), (-221.163760572, 260.258337859), (-221.289329911, 260.338636524), (-221.559862209, 260.441881044), (-221.706261645, 260.465727588), (-221.85268026, 260.465727588)],
                knots=[0, 0, 0, 0, 0.25, 0.25, 0.375, 0.375, 0.5, 0.5, 0.75, 0.75, 1, 1, 1, 1], degree=3))
            Line((-220.75268026, 259.365727588), (-220.75268026, 255.465727588))
            Line((-220.75268026, 255.465727588), (-220.75268026, 254.665727588))
            Line((-220.75268026, 254.665727588), (-221.55268026, 254.665727588))
            Line((-221.55268026, 254.665727588), (-221.55268026, 259.365727588))
            add(Edge.make_bspline(
                [(-221.55268026, 259.365727588), (-221.55268026, 259.665727588), (-221.85268026, 259.665727588)],
                knots=[0, 0, 0, 1, 1, 1], degree=2))
            Line((-221.85268026, 259.665727588), (-224.05268026, 259.665727588))
            Line((-224.05268026, 259.665727588), (-224.05268026, 254.665727588))
        make_face()
    extrude(amount=BOSS_EXTRUDE3_DEPTH)

    # Sketch8 → Cut-Extrude3 (cut, two sides: drawn at the far end of the back side and taken through both)
    with BuildSketch(Plane(origin=(-224.05268026, 0, 0), x_dir=(0, 0, -1), z_dir=(1, 0, 0)).offset(-CUT_EXTRUDE3_DEPTH_BACK)):
        with Locations(Location((257.165727588, 33.597339236, 0), (0, 0, 180))):
            Circle(SKETCH8_R)
    extrude(amount=CUT_EXTRUDE3_DEPTH + CUT_EXTRUDE3_DEPTH_BACK, mode=Mode.SUBTRACT)


solid = part.part
